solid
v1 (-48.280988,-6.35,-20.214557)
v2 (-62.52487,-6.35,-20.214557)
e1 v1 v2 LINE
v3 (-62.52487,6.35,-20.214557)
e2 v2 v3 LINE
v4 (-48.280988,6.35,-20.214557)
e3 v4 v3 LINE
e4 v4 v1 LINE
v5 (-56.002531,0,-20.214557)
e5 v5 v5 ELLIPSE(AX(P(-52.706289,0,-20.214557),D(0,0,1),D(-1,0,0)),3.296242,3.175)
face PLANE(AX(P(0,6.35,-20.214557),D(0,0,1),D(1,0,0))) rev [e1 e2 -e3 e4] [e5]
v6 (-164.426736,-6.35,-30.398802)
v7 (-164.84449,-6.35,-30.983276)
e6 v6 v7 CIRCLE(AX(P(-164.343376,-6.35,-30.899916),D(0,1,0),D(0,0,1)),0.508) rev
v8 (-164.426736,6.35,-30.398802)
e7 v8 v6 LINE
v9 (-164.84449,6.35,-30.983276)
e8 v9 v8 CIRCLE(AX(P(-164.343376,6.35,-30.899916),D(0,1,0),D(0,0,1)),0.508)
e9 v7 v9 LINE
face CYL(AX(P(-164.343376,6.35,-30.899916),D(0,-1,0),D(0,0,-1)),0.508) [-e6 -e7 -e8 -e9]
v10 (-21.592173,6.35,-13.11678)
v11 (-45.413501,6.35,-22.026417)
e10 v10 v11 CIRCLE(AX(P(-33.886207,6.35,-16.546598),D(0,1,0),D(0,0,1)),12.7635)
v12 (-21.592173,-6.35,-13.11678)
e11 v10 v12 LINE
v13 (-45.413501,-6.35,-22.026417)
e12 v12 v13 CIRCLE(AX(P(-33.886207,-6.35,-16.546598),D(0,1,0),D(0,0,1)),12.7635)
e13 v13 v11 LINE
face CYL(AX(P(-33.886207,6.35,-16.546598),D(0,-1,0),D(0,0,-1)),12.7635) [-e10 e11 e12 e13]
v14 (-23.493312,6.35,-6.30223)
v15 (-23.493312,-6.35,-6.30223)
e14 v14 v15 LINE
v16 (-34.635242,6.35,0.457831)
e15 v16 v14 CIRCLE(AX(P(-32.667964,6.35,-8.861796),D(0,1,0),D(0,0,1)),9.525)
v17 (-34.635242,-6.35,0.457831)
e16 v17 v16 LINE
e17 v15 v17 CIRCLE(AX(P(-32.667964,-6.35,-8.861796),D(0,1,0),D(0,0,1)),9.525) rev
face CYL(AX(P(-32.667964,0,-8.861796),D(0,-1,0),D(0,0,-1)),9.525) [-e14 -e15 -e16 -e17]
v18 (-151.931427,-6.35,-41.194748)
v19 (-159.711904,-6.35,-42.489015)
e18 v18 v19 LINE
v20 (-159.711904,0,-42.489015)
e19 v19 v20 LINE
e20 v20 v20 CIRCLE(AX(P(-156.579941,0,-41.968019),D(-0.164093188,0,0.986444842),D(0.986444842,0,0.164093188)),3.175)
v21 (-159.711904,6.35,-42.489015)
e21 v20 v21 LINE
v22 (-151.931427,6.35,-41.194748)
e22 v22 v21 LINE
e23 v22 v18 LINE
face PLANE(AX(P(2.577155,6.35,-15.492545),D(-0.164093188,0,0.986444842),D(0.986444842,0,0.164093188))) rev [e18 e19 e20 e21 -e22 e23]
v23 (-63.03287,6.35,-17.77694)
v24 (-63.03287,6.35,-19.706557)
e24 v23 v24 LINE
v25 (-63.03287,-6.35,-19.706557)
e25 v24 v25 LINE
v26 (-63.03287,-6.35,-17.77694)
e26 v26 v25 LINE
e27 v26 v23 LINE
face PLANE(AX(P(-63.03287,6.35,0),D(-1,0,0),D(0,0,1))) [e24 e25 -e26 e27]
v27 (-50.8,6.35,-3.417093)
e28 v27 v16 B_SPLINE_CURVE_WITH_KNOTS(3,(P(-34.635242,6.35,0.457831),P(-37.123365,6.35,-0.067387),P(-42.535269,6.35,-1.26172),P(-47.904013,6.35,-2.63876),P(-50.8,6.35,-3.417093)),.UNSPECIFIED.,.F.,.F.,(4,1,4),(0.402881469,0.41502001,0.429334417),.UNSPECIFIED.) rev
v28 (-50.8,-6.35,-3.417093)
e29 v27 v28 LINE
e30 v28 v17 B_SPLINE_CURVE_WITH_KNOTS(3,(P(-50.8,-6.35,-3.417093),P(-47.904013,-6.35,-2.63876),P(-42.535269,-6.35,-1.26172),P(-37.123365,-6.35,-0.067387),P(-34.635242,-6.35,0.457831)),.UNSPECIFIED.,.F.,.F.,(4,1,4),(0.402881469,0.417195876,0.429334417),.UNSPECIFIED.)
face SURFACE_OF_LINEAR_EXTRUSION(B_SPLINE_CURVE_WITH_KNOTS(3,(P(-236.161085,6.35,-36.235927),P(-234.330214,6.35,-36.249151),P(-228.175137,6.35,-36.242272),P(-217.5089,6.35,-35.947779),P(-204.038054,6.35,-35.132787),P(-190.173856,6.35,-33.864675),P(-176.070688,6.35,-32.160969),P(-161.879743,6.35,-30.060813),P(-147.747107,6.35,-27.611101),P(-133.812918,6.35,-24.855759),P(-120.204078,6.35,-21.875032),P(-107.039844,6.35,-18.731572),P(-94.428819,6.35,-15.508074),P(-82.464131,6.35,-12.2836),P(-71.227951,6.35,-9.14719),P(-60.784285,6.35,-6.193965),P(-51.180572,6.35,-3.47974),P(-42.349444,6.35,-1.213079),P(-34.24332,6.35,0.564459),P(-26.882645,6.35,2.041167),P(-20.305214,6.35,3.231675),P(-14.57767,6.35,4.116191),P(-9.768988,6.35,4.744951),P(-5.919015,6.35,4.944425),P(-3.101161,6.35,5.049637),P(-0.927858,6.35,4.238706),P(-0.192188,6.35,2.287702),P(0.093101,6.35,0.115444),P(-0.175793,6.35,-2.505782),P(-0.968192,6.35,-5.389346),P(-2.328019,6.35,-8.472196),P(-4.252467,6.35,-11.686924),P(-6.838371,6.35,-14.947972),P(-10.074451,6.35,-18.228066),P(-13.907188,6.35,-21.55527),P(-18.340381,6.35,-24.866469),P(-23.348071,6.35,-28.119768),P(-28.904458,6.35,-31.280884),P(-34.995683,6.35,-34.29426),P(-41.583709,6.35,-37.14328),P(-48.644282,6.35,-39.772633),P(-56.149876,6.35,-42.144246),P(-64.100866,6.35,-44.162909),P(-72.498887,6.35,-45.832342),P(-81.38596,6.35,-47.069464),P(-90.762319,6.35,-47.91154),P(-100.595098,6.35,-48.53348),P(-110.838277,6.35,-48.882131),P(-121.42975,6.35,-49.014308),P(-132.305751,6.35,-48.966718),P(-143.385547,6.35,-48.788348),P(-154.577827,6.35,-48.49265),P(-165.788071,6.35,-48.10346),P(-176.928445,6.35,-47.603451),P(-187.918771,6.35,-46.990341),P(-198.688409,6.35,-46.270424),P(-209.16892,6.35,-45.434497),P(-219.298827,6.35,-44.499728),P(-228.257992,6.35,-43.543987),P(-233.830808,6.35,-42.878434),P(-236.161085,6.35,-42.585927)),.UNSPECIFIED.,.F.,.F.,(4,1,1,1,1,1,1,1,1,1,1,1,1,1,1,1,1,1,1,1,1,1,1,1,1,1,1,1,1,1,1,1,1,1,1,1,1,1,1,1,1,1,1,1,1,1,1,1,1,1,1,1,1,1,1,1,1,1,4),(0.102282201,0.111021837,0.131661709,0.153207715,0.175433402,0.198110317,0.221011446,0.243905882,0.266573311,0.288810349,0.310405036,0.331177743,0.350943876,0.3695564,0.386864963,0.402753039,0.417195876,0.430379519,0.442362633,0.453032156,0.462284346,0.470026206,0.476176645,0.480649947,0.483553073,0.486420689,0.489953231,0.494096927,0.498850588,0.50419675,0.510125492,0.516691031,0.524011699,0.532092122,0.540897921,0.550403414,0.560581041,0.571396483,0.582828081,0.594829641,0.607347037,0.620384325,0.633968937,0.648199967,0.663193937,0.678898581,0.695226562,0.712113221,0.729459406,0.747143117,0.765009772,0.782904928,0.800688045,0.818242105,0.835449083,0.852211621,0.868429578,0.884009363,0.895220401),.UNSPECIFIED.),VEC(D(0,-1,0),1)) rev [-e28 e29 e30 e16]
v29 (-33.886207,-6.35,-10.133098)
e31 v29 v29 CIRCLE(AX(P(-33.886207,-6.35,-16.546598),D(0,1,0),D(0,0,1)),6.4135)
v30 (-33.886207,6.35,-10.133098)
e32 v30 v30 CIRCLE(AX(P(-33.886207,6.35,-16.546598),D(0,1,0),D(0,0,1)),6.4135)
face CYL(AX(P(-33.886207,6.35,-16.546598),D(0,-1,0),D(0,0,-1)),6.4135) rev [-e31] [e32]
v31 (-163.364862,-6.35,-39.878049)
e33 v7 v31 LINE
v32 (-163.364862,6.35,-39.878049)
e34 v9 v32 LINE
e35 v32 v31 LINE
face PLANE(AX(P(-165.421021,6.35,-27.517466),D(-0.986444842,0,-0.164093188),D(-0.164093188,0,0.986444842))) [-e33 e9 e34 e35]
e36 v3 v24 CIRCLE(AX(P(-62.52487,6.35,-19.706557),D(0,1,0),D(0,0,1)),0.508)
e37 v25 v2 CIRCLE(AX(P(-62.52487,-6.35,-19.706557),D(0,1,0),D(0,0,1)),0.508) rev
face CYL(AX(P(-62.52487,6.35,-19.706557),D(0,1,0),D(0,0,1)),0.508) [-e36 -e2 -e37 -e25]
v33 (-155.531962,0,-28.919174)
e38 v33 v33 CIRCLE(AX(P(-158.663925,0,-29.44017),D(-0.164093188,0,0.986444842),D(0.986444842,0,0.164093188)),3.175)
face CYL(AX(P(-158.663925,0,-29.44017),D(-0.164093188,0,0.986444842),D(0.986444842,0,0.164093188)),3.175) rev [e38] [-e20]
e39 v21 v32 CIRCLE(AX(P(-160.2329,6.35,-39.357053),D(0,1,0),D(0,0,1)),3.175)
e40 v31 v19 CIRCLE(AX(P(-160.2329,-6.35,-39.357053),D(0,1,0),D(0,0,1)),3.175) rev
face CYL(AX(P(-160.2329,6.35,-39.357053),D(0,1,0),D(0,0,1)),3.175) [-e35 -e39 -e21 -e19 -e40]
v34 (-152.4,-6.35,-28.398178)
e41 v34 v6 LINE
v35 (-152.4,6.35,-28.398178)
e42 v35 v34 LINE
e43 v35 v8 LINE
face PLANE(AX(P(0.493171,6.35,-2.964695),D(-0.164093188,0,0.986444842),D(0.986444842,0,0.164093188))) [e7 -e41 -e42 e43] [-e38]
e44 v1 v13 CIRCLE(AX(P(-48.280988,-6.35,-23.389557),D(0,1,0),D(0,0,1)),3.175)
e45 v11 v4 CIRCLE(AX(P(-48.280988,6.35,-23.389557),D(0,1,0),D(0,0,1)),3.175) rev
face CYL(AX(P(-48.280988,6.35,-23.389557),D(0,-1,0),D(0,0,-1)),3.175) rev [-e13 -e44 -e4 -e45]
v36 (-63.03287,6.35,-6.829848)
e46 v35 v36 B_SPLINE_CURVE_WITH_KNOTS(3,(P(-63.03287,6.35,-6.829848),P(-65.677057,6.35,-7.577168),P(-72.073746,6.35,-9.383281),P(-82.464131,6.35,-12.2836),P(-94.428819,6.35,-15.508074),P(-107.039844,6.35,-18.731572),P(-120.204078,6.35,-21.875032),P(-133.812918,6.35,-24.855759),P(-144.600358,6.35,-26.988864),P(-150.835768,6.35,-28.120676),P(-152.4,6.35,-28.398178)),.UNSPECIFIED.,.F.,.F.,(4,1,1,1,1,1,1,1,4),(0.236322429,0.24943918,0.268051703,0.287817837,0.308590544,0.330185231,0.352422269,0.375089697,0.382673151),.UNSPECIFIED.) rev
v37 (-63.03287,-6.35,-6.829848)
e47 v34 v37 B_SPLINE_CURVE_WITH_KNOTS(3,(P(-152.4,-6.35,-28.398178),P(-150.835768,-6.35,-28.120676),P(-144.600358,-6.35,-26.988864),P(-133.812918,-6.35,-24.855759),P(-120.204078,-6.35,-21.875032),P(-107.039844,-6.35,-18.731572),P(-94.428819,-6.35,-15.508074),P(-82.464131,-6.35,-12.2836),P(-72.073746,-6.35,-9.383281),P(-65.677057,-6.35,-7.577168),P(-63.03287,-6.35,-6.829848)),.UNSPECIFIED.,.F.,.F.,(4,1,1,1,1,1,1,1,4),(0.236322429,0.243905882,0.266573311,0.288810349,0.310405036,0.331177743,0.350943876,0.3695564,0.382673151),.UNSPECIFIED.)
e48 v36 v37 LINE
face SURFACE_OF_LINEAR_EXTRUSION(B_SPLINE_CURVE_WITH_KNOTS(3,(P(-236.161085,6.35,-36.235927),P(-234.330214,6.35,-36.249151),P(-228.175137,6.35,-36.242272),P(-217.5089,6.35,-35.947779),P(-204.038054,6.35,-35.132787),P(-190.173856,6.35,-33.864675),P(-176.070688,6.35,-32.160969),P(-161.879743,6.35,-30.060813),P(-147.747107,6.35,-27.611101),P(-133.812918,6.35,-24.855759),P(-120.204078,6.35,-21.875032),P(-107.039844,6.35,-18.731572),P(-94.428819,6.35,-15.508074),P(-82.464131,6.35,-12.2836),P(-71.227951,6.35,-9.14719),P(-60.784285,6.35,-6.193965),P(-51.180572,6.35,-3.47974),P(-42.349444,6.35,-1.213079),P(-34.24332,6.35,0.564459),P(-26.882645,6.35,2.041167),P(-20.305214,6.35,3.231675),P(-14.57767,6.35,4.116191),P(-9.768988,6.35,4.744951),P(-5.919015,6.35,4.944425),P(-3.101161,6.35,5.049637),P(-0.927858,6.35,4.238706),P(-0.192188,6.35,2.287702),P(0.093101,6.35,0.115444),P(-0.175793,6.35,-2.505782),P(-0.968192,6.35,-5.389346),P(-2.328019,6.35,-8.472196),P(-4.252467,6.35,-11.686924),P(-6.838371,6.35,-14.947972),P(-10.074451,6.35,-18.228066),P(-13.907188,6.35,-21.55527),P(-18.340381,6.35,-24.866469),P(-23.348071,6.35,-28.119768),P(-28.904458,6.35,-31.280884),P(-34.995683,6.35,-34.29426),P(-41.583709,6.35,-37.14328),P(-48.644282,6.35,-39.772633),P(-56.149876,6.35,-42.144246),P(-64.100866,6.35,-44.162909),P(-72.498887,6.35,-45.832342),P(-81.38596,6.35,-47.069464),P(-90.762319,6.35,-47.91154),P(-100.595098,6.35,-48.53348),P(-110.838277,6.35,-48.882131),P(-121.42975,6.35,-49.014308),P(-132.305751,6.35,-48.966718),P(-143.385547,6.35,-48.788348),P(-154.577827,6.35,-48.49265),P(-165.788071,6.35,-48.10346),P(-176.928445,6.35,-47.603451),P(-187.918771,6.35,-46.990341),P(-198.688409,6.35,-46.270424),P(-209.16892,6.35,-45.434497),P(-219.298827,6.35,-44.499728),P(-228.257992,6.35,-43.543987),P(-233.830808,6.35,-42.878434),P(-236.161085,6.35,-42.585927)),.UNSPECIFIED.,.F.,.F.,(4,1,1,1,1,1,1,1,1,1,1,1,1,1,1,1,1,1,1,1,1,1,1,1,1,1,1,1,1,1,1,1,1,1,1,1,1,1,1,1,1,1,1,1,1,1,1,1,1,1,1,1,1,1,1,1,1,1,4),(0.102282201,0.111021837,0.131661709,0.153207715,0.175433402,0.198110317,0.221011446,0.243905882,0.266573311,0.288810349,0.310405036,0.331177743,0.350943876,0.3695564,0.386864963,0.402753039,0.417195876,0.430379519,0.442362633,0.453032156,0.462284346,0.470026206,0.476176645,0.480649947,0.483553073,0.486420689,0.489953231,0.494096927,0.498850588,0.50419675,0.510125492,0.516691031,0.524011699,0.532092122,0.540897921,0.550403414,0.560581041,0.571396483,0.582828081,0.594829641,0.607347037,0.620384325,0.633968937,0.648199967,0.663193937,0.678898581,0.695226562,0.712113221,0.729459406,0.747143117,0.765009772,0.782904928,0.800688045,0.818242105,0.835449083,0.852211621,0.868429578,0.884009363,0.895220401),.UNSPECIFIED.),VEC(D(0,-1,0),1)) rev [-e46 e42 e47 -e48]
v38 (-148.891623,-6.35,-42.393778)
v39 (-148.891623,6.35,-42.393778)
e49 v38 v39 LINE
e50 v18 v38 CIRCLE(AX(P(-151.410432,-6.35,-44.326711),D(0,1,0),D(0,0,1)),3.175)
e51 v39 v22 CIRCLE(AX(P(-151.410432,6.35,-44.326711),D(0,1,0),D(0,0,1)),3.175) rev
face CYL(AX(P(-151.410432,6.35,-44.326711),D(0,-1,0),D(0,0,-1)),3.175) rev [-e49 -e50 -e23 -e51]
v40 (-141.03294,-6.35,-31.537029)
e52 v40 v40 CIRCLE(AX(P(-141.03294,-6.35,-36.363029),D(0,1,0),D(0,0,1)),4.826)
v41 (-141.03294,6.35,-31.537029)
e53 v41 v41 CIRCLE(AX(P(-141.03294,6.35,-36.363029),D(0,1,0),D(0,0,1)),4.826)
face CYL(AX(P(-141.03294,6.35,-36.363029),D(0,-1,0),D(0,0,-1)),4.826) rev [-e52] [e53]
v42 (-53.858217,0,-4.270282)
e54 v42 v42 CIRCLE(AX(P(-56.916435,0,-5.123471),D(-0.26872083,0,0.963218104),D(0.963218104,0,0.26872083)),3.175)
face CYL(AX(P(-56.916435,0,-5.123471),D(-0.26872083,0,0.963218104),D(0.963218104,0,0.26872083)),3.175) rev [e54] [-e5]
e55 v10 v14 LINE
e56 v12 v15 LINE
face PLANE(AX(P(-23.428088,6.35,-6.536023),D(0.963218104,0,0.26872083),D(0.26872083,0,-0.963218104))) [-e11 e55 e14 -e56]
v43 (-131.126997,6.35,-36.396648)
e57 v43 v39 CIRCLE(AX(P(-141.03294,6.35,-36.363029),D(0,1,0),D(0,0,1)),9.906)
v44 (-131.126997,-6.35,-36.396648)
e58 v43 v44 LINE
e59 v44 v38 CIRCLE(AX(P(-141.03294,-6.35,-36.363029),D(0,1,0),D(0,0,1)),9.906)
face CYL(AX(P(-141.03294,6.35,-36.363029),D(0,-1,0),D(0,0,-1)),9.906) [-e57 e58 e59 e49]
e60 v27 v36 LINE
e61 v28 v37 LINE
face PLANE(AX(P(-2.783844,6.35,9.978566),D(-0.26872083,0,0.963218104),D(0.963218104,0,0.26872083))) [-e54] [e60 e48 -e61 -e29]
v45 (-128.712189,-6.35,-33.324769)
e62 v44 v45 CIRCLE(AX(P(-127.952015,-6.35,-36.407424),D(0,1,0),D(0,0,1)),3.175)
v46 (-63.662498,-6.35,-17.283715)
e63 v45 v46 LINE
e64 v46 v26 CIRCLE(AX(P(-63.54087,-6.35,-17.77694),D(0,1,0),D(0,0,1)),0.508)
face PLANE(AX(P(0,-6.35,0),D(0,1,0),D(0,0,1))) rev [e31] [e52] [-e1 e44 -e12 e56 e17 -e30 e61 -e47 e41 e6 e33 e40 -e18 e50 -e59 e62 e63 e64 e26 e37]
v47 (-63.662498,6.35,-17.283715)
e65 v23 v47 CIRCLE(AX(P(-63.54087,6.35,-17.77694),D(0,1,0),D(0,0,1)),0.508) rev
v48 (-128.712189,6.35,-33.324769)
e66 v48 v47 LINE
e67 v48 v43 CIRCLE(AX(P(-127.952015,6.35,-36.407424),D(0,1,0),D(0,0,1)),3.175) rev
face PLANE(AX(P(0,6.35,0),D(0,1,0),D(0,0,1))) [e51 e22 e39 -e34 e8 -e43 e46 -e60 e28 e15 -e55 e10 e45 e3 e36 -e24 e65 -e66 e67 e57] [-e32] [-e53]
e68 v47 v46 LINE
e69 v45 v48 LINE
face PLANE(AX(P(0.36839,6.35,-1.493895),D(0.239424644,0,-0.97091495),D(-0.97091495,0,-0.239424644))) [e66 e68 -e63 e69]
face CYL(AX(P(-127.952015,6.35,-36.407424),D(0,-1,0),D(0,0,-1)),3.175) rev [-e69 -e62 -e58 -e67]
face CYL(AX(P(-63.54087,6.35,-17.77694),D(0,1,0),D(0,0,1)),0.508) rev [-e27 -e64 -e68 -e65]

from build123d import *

# Parameters (mm, degrees)
BOSS_EXTRUDE1_DEPTH                   = 6.35
FILLET1_R                             = 3.175
FILLET4_R                             = 0.508
F_1_4_0_25_DIAMETER_HOLE1_D           = 6.35
F_1_4_0_25_DIAMETER_HOLE1_ON_FACE_2_D = 6.35
FILLET8_R                             = 9.525


with BuildPart() as part:
    # Sketch1 → Boss-Extrude1 (new, symmetric)
    # profile 1 of 13: a face of its own
    with BuildSketch(Plane(origin=(0, 0, 0), x_dir=(1, 0, 0), z_dir=(0, 1, 0))):
        Polygon((-63.032869919, 6.829847883), (-50.8, 3.417093343), (-50.117449092, 5.863667327), (-48.008399772, 13.423462702), (-63.032869919, 17.128450878), align=None)
    # profile 2 of 13: a face of its own
    with BuildSketch(Plane(origin=(0, 0, 0), x_dir=(1, 0, 0), z_dir=(0, 1, 0))):
        with BuildLine():
            Line((-50.117449092, 5.863667327), (-50.8, 3.417093343))
            add(Edge.make_bspline(
                [(-50.8, 3.417093343), (-47.90401251, 2.638759622), (-42.323161066, 1.207315918), (-34.243320379, -0.564459364), (-28.828072067, -1.650873486), (-26.114874946, -2.164171794), (-25.868230414, -2.21056185)],
                knots=[0.402881469, 0.402881469, 0.402881469, 0.402881469, 0.417195876, 0.430379519, 0.442362633, 0.443560626, 0.443560626, 0.443560626, 0.443560626], degree=3))
            Line((-25.868230414, -2.21056185), (-25.529380555, -0.995969297))
            Line((-25.529380555, -0.995969297), (-50.117449092, 5.863667327))
        make_face()
    # profile 3 of 13: a face of its own
    with BuildSketch(Plane(origin=(0, 0, 0), x_dir=(1, 0, 0), z_dir=(0, 1, 0))):
        with BuildLine():
            add(Edge.make_bspline(
                [(-142.916964795, 26.637840254), (-139.851770269, 26.044031657), (-132.224118107, 24.507766264), (-120.204077857, 21.875031645), (-107.039843971, 18.731571582), (-94.42881917, 15.508074422), (-82.464130524, 12.283599717), (-72.07374601, 9.383281264), (-65.6770572, 7.577167824), (-63.032869919, 6.829847883)],
                knots=[0.2516695, 0.2516695, 0.2516695, 0.2516695, 0.266573311, 0.288810349, 0.310405036, 0.331177743, 0.350943876, 0.3695564, 0.382673151, 0.382673151, 0.382673151, 0.382673151], degree=3))
            Line((-63.032869919, 6.829847883), (-63.032869919, 17.128450878))
            Line((-63.032869919, 17.128450878), (-131.41505653, 33.991287994))
            ThreePointArc((-131.41505653, 33.991287994), (-135.697076354, 28.016927932), (-142.916964795, 26.637840254))
        make_face()
    # profile 4 of 13: a face of its own
    with BuildSketch(Plane(origin=(0, 0, 0), x_dir=(1, 0, 0), z_dir=(0, 1, 0))):
        with BuildLine():
            Line((-48.008399772, 13.423462702), (-50.117449092, 5.863667327))
            Line((-50.117449092, 5.863667327), (-25.529380555, -0.995969297))
            Line((-25.529380555, -0.995969297), (-21.592172885, 13.116780012))
            ThreePointArc((-21.592172885, 13.116780012), (-33.805570634, 3.783353047), (-46.135923457, 12.961715796))
            Line((-46.135923457, 12.961715796), (-48.008399772, 13.423462702))
        make_face()
    # profile 5 of 13: a face of its own
    with BuildSketch(Plane(origin=(0, 0, 0), x_dir=(1, 0, 0), z_dir=(0, 1, 0))):
        Polygon((-63.032869919, 20.214556587), (-63.032869919, 17.128450878), (-48.008399772, 13.423462702), (-46.180241275, 19.976417164), (-46.113804584, 20.214556587), align=None)
    # profile 6 of 13: a face of its own
    with BuildSketch(Plane(origin=(0, 0, 0), x_dir=(1, 0, 0), z_dir=(0, 1, 0))):
        with BuildLine():
            add(Edge.make_bspline(
                [(-152.4, 28.398178215), (-150.835767653, 28.120675984), (-147.672379647, 27.546477658), (-144.513670254, 26.947163992), (-142.916964795, 26.637840254)],
                knots=[0.236322429, 0.236322429, 0.236322429, 0.236322429, 0.243905882, 0.2516695, 0.2516695, 0.2516695, 0.2516695], degree=3))
            ThreePointArc((-142.916964795, 26.637840254), (-149.167660925, 30.710139705), (-150.804662589, 37.988535853))
            Line((-150.804662589, 37.988535853), (-152.4, 28.398178215))
        make_face()
    # profile 7 of 13: a face of its own
    with BuildSketch(Plane(origin=(0, 0, 0), x_dir=(1, 0, 0), z_dir=(0, 1, 0))):
        with BuildLine():
            ThreePointArc((-150.804662589, 37.988535853), (-149.167660925, 30.710139705), (-142.916964795, 26.637840254))
            ThreePointArc((-142.916964795, 26.637840254), (-135.697076354, 28.016927932), (-131.41505653, 33.991287994))
            ThreePointArc((-131.41505653, 33.991287994), (-131.199232943, 35.168440277), (-131.126940024, 36.363028513))
            ThreePointArc((-131.126940024, 36.363028513), (-138.72556699, 45.996556718), (-149.864041918, 40.850842606))
            ThreePointArc((-149.864041918, 40.850842606), (-150.443809774, 39.45565952), (-150.804662589, 37.988535853))
        make_face()
        with BuildLine():
            ThreePointArc((-136.206940024, 36.363028513), (-136.242159651, 35.781049629), (-136.347304475, 35.207565183))
            ThreePointArc((-136.347304475, 35.207565183), (-145.823720397, 36.945007397), (-136.206940024, 36.363028513))
        make_face(mode=Mode.SUBTRACT)
    # profile 8 of 13: a face of its own
    with BuildSketch(Plane(origin=(0, 0, 0), x_dir=(1, 0, 0), z_dir=(0, 1, 0))):
        with BuildLine():
            Line((-46.180241275, 19.976417164), (-48.008399772, 13.423462702))
            Line((-48.008399772, 13.423462702), (-46.135923457, 12.961715796))
            ThreePointArc((-46.135923457, 12.961715796), (-46.649452433, 16.465962078), (-46.180241275, 19.976417164))
        make_face()
    # profile 9 of 13: a face of its own
    with BuildSketch(Plane(origin=(0, 0, 0), x_dir=(1, 0, 0), z_dir=(0, 1, 0))):
        with BuildLine():
            Line((-152.4, 28.398178215), (-150.804662589, 37.988535853))
            Line((-150.804662589, 37.988535853), (-150.316016511, 40.926027704))
            Line((-150.316016511, 40.926027704), (-162.843866, 43.010011192))
            Line((-162.843866, 43.010011192), (-164.927849489, 30.482161703))
            add(Edge.make_bspline(
                [(-164.927849489, 30.482161703), (-163.914067431, 30.324847033), (-159.732455899, 29.664434578), (-155.558182899, 28.958454826), (-152.4, 28.398178215)],
                knots=[0.216114261, 0.216114261, 0.216114261, 0.216114261, 0.221011446, 0.236322429, 0.236322429, 0.236322429, 0.236322429], degree=3))
        make_face()
    # profile 10 of 13: a face of its own
    with BuildSketch(Plane(origin=(0, 0, 0), x_dir=(1, 0, 0), z_dir=(0, 1, 0))):
        with BuildLine():
            Line((-150.316016511, 40.926027704), (-150.804662589, 37.988535853))
            ThreePointArc((-150.804662589, 37.988535853), (-150.443809774, 39.45565952), (-149.864041918, 40.850842606))
            Line((-149.864041918, 40.850842606), (-150.316016511, 40.926027704))
        make_face()
    # profile 11 of 13: a face of its own
    with BuildSketch(Plane(origin=(0, 0, 0), x_dir=(1, 0, 0), z_dir=(0, 1, 0))):
        with BuildLine():
            Line((-164.927849489, 30.482161703), (-152.4, 28.398178215))
            add(Edge.make_bspline(
                [(-164.927849489, 30.482161703), (-163.914067431, 30.324847033), (-159.732455899, 29.664434578), (-155.558182899, 28.958454826), (-152.4, 28.398178215)],
                knots=[0.216114261, 0.216114261, 0.216114261, 0.216114261, 0.221011446, 0.236322429, 0.236322429, 0.236322429, 0.236322429], degree=3))
        make_face()
    # profile 12 of 13: a face of its own
    with BuildSketch(Plane(origin=(0, 0, 0), x_dir=(1, 0, 0), z_dir=(0, 1, 0))):
        with BuildLine():
            Line((-46.113804584, 20.214556587), (-46.180241275, 19.976417164))
            ThreePointArc((-46.180241275, 19.976417164), (-46.14635129, 20.095654256), (-46.111304881, 20.214556587))
            Line((-46.111304881, 20.214556587), (-46.113804584, 20.214556587))
        make_face()
    # profile 13 of 13: a face of its own
    with BuildSketch(Plane(origin=(0, 0, 0), x_dir=(1, 0, 0), z_dir=(0, 1, 0))):
        with BuildLine():
            ThreePointArc((-46.111304881, 20.214556587), (-46.14635129, 20.095654256), (-46.180241275, 19.976417164))
            ThreePointArc((-46.180241275, 19.976417164), (-46.649452433, 16.465962078), (-46.135923457, 12.961715796))
            ThreePointArc((-46.135923457, 12.961715796), (-33.805570634, 3.783353047), (-21.592172885, 13.116780012))
            ThreePointArc((-21.592172885, 13.116780012), (-21.240618227, 14.815698867), (-21.122707154, 16.546598324))
            ThreePointArc((-21.122707154, 16.546598324), (-32.032575932, 29.17478044), (-46.111304881, 20.214556587))
        make_face()
        with BuildLine():
            ThreePointArc((-27.472707154, 16.546598324), (-29.931164004, 11.497775102), (-35.421757105, 10.319635293))
            ThreePointArc((-35.421757105, 10.319635293), (-37.841250304, 21.595421547), (-27.472707154, 16.546598324))
        make_face(mode=Mode.SUBTRACT)
    extrude(amount=BOSS_EXTRUDE1_DEPTH, both=True)

    # Fillet1
    # the kernel refuses this fillet: 3.175 mm, written as the material it adds along each edge
    with BuildSketch(Plane(origin=(-149.864041918, 6.35, -40.850842606), x_dir=(0.5331827682272952, 0, -0.8460000801805391), z_dir=(0, -1, 0))) as fillet1_piece_1:
        with BuildLine():
            CenterArc((2.116076272, -3.161518606), FILLET1_R, 95.281860793, 61.941944222)
            Line((-0.811350167, -1.932372788), (0, 0))
            ThreePointArc((0, 0), (0.911900272, -0.042061948), (1.823800544, 0))
        make_face()
    extrude(amount=12.7)
    with BuildSketch(Plane(origin=(-131.41505653, -6.35, -33.991287994), x_dir=(0.9709149499625199, 0, 0.23942464355048618), z_dir=(0, 1, 0))) as fillet1_piece_2:
        with BuildLine():
            CenterArc((2.783835933, 3.175), FILLET1_R, 194.047041006, 75.952958994)
            ThreePointArc((-0.296221332, 2.404368932), (-0.074334234, 1.211273817), (0, 0))
            Line((0, 0), (2.783835933, 0))
        make_face()
    extrude(amount=12.7)
    with BuildSketch(Plane(origin=(-46.111304881, 6.35, -20.214556587), x_dir=(-1, 0, 0), z_dir=(0, -1, 0)), Plane(origin=(-46.111304881, 0, -20.214556587), x_dir=(-1, 0, 0), z_dir=(0, -1, 0))) as fillet1_piece_3:
        with BuildLine():
            CenterArc((2.169682732, 3.175), FILLET1_R, 205.425374389, 64.574625611)
            ThreePointArc((-0.697803415, 1.811860904), (-0.314399096, 0.91921847), (0, 0))
            Line((0, 0), (2.169682732, 0))
        make_face()
    extrude(amount=6.35)
    # the kernel refuses this fillet: 3.175 mm, written as the material it takes off along each edge
    with BuildSketch(Plane(origin=(-162.843866, 14.2875, -43.010011192), x_dir=(-0.16409318808875556, 0, 0.9864448416525216), z_dir=(0, -1, 0))) as fillet1_2_piece_1:
        with BuildLine():
            CenterArc((FILLET1_R, -FILLET1_R), FILLET1_R, 90, 90)
            Line((0, -FILLET1_R), (0, 0))
            Line((0, 0), (FILLET1_R, 0))
        make_face()
    extrude(amount=28.575, mode=Mode.SUBTRACT)

    # Fillet4
    fillet4_edges = [part.edges().sort_by_distance(p)[0] for p in [
        (-164.927849489, 0, -30.482161703),
        (-63.032869919, 0, -17.128450878),
        (-63.032869919, 0, -20.214556587),
    ]]
    fillet(fillet4_edges, radius=FILLET4_R)

    # 1/4 (0.25) Diameter Hole1 (through all)
    with Locations(Plane(origin=(-56.916434959, 0, -5.123470613), x_dir=(0.963218103856, 0, 0.268720829868), z_dir=(-0.268720829868, 0, 0.963218103856))):
        with Locations((0, 0)):
            Hole(F_1_4_0_25_DIAMETER_HOLE1_D / 2)

    # 1/4 (0.25) Diameter Hole1 on face 2 (through all)
    with Locations(Plane(origin=(-158.663924744, 0, -29.440169959), x_dir=(0.986444876362, 0, 0.164092979433), z_dir=(-0.164092979433, 0, 0.986444876362))):
        with Locations((0, 0)):
            Hole(F_1_4_0_25_DIAMETER_HOLE1_ON_FACE_2_D / 2)

    # Fillet8
    fillet8_edges = [part.edges().sort_by_distance(p)[0] for p in [
        (-25.868230414, -3.175, 2.21056185),
    ]]
    fillet(fillet8_edges, radius=FILLET8_R)


solid = part.part
